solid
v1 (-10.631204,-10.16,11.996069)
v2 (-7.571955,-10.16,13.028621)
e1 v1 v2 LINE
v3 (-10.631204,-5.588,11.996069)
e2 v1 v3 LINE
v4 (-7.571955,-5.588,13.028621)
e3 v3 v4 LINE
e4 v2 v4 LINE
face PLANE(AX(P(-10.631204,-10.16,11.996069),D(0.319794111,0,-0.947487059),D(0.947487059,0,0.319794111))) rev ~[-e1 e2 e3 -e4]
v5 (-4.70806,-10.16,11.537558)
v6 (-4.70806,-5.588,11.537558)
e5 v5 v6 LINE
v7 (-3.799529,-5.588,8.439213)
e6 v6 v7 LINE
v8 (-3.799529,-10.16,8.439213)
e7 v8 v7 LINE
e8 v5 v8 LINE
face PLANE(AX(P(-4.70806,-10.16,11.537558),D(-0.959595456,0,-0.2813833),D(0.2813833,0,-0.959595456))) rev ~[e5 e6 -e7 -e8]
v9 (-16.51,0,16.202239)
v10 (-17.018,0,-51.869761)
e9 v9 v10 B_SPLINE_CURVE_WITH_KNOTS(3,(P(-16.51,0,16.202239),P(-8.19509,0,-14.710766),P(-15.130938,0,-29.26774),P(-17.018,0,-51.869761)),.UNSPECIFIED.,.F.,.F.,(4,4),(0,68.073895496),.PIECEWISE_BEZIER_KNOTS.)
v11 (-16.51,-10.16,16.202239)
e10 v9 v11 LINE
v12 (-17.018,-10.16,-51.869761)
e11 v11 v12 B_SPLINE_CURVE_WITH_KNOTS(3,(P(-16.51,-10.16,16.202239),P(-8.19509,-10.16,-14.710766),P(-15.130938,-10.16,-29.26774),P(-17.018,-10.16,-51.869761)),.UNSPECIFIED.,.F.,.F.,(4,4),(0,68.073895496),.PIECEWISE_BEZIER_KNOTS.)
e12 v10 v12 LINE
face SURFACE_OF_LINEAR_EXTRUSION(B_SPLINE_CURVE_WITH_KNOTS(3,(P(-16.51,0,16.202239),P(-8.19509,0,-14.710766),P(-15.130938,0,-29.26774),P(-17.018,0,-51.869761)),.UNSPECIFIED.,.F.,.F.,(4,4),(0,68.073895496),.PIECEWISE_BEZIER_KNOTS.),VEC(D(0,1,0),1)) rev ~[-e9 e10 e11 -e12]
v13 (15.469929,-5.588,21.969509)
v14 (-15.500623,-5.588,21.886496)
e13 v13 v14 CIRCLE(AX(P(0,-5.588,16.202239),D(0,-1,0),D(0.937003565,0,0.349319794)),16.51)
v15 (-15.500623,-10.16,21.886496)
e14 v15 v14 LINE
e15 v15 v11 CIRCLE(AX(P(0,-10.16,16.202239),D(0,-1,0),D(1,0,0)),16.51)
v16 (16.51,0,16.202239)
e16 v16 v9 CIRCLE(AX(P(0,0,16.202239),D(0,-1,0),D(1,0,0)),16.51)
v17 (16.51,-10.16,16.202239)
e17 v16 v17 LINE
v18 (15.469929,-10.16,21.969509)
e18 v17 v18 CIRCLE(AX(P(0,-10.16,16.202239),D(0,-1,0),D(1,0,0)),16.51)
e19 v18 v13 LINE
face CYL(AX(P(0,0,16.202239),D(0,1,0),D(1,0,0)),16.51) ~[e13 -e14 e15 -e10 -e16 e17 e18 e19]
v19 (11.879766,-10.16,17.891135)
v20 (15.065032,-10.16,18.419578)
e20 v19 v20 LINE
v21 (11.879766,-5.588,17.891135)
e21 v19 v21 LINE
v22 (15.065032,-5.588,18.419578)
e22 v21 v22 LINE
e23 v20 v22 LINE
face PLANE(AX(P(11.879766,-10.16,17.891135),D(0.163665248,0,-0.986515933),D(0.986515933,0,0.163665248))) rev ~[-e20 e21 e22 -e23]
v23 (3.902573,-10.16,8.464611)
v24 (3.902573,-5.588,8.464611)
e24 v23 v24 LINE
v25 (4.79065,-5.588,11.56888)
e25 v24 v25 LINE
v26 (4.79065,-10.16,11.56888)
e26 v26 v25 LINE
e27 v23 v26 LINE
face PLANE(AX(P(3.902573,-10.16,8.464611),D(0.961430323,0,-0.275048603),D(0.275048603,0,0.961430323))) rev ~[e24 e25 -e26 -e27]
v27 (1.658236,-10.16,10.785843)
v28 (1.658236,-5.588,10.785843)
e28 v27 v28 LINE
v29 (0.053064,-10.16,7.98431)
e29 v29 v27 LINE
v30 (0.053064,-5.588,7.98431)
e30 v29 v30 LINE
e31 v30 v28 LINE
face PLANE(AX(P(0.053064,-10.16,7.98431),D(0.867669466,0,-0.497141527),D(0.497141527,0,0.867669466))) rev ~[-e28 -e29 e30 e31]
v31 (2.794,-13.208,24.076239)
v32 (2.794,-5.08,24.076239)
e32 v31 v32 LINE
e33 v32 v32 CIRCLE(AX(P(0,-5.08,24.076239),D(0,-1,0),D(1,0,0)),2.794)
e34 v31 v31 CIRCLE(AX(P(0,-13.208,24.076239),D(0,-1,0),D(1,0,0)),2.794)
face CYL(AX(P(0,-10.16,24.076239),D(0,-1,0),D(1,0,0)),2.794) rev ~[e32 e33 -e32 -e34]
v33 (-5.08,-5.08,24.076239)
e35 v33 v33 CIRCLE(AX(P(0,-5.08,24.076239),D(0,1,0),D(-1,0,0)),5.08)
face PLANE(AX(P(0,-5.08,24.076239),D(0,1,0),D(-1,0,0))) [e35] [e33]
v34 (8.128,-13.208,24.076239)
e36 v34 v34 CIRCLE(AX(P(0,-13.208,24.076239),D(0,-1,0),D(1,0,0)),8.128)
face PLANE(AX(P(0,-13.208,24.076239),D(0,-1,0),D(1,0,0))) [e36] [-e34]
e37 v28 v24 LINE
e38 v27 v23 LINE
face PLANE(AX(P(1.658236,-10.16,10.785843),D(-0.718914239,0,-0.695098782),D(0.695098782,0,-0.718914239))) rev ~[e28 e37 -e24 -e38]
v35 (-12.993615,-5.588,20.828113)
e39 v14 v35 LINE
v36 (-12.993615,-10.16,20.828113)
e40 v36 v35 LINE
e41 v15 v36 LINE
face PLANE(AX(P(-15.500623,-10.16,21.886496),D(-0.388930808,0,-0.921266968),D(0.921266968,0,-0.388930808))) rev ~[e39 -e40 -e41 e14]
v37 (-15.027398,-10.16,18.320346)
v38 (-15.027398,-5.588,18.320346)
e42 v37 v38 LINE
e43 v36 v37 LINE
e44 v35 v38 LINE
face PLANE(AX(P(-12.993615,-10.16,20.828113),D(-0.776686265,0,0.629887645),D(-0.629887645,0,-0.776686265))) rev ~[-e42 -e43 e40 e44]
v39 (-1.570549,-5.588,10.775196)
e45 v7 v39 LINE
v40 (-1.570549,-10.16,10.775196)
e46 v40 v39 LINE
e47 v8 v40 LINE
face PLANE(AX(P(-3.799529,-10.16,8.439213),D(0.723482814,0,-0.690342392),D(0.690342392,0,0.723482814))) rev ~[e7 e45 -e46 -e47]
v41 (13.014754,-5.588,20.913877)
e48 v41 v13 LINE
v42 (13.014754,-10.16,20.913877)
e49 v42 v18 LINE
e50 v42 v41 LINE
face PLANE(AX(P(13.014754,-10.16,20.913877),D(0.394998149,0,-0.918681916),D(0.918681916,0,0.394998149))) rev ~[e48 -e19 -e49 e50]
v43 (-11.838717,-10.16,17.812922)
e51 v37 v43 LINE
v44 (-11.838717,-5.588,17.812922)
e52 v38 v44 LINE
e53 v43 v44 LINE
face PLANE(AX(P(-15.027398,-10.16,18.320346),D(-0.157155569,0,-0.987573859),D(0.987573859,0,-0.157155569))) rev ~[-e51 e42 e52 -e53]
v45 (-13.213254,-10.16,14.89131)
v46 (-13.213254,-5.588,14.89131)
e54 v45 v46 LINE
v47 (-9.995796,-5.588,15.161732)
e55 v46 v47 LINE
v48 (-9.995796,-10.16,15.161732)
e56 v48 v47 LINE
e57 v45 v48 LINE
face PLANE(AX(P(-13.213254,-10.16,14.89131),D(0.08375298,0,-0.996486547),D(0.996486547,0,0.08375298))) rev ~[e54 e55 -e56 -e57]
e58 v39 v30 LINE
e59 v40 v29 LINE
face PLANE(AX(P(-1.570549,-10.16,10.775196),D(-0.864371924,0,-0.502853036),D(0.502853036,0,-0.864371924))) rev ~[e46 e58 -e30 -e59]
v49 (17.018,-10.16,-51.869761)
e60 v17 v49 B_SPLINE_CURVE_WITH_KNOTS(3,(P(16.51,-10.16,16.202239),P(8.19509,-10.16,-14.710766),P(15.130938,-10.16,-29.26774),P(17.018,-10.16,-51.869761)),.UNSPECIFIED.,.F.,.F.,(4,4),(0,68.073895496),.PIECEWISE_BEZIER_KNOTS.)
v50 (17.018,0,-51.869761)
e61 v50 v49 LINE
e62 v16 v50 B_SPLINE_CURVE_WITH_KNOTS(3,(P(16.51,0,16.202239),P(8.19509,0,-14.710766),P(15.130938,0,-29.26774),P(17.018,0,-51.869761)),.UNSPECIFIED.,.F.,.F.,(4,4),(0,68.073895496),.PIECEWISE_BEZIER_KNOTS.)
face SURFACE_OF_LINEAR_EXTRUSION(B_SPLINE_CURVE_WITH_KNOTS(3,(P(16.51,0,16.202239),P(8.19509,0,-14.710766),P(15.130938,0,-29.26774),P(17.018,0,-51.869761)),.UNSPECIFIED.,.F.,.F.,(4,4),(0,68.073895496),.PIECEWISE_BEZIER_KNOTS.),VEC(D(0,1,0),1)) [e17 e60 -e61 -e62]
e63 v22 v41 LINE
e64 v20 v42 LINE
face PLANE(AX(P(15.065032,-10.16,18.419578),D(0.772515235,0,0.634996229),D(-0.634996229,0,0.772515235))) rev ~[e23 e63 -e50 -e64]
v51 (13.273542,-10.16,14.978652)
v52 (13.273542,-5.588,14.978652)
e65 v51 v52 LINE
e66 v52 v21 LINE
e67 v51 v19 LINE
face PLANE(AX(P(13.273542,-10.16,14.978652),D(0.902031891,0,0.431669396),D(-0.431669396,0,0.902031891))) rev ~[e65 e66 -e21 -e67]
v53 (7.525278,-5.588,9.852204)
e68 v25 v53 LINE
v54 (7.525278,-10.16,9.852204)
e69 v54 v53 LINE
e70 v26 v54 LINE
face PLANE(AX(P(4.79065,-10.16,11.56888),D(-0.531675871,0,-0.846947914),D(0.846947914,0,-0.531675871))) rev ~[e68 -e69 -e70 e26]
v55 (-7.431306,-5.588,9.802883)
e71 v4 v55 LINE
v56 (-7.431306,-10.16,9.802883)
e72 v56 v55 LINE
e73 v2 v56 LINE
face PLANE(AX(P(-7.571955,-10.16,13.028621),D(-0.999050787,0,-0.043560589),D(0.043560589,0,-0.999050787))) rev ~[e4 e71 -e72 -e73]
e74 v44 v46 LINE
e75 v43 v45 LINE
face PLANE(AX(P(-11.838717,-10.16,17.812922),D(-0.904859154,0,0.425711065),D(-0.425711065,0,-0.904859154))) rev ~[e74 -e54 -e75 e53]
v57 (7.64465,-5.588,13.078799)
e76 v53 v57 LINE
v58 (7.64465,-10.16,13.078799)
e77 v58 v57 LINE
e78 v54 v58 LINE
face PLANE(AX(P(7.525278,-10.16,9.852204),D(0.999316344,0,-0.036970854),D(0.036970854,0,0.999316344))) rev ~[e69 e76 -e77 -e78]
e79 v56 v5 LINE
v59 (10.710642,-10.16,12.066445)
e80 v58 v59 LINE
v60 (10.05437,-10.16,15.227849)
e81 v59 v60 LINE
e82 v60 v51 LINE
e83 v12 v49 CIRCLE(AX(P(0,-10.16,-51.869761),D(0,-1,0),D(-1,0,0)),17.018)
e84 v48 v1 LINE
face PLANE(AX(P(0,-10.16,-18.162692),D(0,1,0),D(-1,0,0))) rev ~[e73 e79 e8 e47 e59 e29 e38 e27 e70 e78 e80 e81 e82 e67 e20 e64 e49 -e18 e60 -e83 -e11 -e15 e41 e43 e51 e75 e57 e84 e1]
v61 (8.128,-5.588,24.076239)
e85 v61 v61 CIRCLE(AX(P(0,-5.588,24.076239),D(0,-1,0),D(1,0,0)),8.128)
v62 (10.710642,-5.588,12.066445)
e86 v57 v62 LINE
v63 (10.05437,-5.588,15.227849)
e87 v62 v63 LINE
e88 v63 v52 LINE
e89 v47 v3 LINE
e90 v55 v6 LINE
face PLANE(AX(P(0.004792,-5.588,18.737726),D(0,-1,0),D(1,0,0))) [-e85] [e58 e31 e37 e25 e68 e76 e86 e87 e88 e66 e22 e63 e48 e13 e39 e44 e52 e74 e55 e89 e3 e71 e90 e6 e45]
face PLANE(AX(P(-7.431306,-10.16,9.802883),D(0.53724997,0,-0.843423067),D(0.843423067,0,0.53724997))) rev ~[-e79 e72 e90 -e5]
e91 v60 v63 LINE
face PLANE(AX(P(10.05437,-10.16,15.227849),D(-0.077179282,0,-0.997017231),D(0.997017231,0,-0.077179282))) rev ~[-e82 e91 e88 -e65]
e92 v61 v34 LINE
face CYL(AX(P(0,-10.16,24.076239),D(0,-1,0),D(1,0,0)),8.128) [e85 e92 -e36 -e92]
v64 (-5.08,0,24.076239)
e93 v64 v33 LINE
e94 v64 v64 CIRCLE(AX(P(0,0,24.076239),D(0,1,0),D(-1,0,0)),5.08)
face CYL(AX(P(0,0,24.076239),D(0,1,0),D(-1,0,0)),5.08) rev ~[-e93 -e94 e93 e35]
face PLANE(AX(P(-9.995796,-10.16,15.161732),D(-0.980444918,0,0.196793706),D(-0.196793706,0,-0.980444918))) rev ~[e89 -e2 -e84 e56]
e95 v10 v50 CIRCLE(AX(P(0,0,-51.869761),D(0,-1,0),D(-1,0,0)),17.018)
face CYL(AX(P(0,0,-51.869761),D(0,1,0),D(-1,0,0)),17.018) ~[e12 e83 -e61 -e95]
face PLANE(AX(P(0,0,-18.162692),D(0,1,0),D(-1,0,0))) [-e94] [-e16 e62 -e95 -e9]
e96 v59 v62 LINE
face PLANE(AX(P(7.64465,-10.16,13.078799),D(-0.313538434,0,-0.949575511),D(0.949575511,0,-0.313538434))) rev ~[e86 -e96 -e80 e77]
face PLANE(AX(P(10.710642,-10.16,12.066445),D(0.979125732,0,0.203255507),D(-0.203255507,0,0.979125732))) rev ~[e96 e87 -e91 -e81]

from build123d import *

# Parameters (mm, degrees)
F1_DEPTH = 10.16
F2_R     = 8.128
F2_R_2   = 2.794
F3_DEPTH = 3.048
F4_DEPTH = 50.8
F5_R     = 8.128
F6_DEPTH = 4.572
F7_R     = 5.08
F7_R_2   = 2.794
F8_DEPTH = 5.08


with BuildPart() as f1:
    # F0 (on Front) → F1 (new body)
    with BuildSketch(Plane.XZ):
        with BuildLine():
            add(Edge.make_bspline(
                [(16.51, 16.2022389048), (8.1950903917, -14.7107664531), (15.1309384414, -29.2677398155), (17.018, -51.8697610952)],
                knots=[0, 0, 0, 0, 68.073895496, 68.073895496, 68.073895496, 68.073895496], degree=3))
            ThreePointArc((16.51, 16.2022389048), (0, 32.7122389048), (-16.51, 16.2022389048))
            add(Edge.make_bspline(
                [(-16.51, 16.2022389048), (-8.1950903917, -14.7107664531), (-15.1309384414, -29.2677398155), (-17.018, -51.8697610952)],
                knots=[0, 0, 0, 0, 68.073895496, 68.073895496, 68.073895496, 68.073895496], degree=3))
            ThreePointArc((-17.018, -51.8697610952), (0, -68.8877610952), (17.018, -51.8697610952))
        make_face()
    extrude(amount=F1_DEPTH)

    # F2 (on face) → F3 (join)
    with BuildSketch(Plane.XZ.offset(10.16)):
        with Locations((0, 24.0762389048)):
            Circle(F2_R)
        with Locations((0, 24.0762389048)):
            Circle(F2_R_2, mode=Mode.SUBTRACT)
    extrude(amount=F3_DEPTH)

    # F4 (cut, symmetric): a face of the model
    f4_faces = [f1.faces().sort_by_distance(p)[0] for p in [
        (0, -10.16, 24.0762389048),
    ]]
    extrude(f4_faces, amount=F4_DEPTH, both=True, mode=Mode.SUBTRACT)

    # F5 (on face) → F6 (cut)
    with BuildSketch(Plane.XZ.offset(10.16)):
        with BuildLine():
            ThreePointArc((15.469928865, 21.9695087018), (-0.0442530739, 32.7121795972), (-15.5006234178, 21.8864955545))
            Line((-15.5006234178, 21.8864955545), (-12.9936152173, 20.8281131752))
            Line((-12.9936152173, 20.8281131752), (-15.0273981388, 18.3203464733))
            Line((-15.0273981388, 18.3203464733), (-11.8387170074, 17.8129221485))
            Line((-11.8387170074, 17.8129221485), (-13.2132540393, 14.8913104783))
            Line((-13.2132540393, 14.8913104783), (-9.995795597, 15.1617323254))
            Line((-9.995795597, 15.1617323254), (-10.6312036432, 11.9960691377))
            Line((-10.6312036432, 11.9960691377), (-7.5719548797, 13.0286212217))
            Line((-7.5719548797, 13.0286212217), (-7.4313063342, 9.8028833542))
            Line((-7.4313063342, 9.8028833542), (-4.7080596678, 11.5375575014))
            Line((-4.7080596678, 11.5375575014), (-3.7995285128, 8.4392131139))
            Line((-3.7995285128, 8.4392131139), (-1.570549141, 10.7751963679))
            Line((-1.570549141, 10.7751963679), (0.0530640951, 7.9843099742))
            Line((0.0530640951, 7.9843099742), (1.6582359931, 10.7858434794))
            Line((1.6582359931, 10.7858434794), (3.9025728106, 8.4646112522))
            Line((3.9025728106, 8.4646112522), (4.7906504787, 11.5688800644))
            Line((4.7906504787, 11.5688800644), (7.5252781797, 9.8522035834))
            Line((7.5252781797, 9.8522035834), (7.6446497718, 13.0787988828))
            Line((7.6446497718, 13.0787988828), (10.7106417342, 12.0664451452))
            Line((10.7106417342, 12.0664451452), (10.0543698074, 15.2278489412))
            Line((10.0543698074, 15.2278489412), (13.2735417227, 14.9786522665))
            Line((13.2735417227, 14.9786522665), (11.8797664159, 17.8911352617))
            Line((11.8797664159, 17.8911352617), (15.0650317137, 18.4195780548))
            Line((15.0650317137, 18.4195780548), (13.0147541814, 20.913877324))
            Line((13.0147541814, 20.913877324), (15.469928865, 21.9695087018))
        make_face()
        with BuildLine():
            Line((-11.7664292563, 17.8014187834), (-11.8387170074, 17.8129221485))
            Line((-11.8387170074, 17.8129221485), (-11.8075561021, 17.8791554056))
            ThreePointArc((-11.8075561021, 17.8791554056), (-11.7870567643, 17.84025319), (-11.7664292563, 17.8014187834))
        make_face(mode=Mode.SUBTRACT)
        with BuildLine():
            Line((-9.9228554611, 15.1678628183), (-9.995795597, 15.1617323254))
            Line((-9.995795597, 15.1617323254), (-9.9813908269, 15.2334982572))
            ThreePointArc((-9.9813908269, 15.2334982572), (-9.952177253, 15.2006322819), (-9.9228554611, 15.1678628183))
        make_face(mode=Mode.SUBTRACT)
        with BuildLine():
            Line((-12.9261809524, 20.7996444858), (-12.9936152173, 20.8281131752))
            Line((-12.9936152173, 20.8281131752), (-12.9475091354, 20.8849645215))
            ThreePointArc((-12.9475091354, 20.8849645215), (-12.9369153807, 20.842286921), (-12.9261809524, 20.7996444858))
        make_face(mode=Mode.SUBTRACT)
        with BuildLine():
            Line((-7.5026013746, 13.0520292908), (-7.5719548797, 13.0286212217))
            Line((-7.5719548797, 13.0286212217), (-7.5751433977, 13.1017490531))
            ThreePointArc((-7.5751433977, 13.1017490531), (-7.5389133745, 13.0768293692), (-7.5026013746, 13.0520292908))
        make_face(mode=Mode.SUBTRACT)
        with BuildLine():
            Line((-4.646323367, 11.5768827546), (-4.7080596678, 11.5375575014))
            Line((-4.7080596678, 11.5375575014), (-4.7286561687, 11.6077973086))
            ThreePointArc((-4.7286561687, 11.6077973086), (-4.6875152535, 11.5922721575), (-4.646323367, 11.5768827546))
        make_face(mode=Mode.SUBTRACT)
        with BuildLine():
            Line((-1.5200179341, 10.8281533646), (-1.570549141, 10.7751963679))
            Line((-1.570549141, 10.7751963679), (-1.6073566312, 10.8384660687))
            ThreePointArc((-1.6073566312, 10.8384660687), (-1.5636957843, 10.8332377157), (-1.5200179341, 10.8281533646))
        make_face(mode=Mode.SUBTRACT)
        with BuildLine():
            Line((1.6946254161, 10.8493545514), (1.6582359931, 10.7858434794))
            Line((1.6582359931, 10.7858434794), (1.6073566312, 10.8384660687))
            ThreePointArc((1.6073566312, 10.8384660687), (1.651, 10.8438383667), (1.6946254161, 10.8493545514))
        make_face(mode=Mode.SUBTRACT)
        with BuildLine():
            Line((4.8107832969, 11.639254179), (4.7906504787, 11.5688800644))
            Line((4.7906504787, 11.5688800644), (4.7286561687, 11.6077973086))
            ThreePointArc((4.7286561687, 11.6077973086), (4.7697456655, 11.6234580392), (4.8107832969, 11.639254179))
        make_face(mode=Mode.SUBTRACT)
        with BuildLine():
            Line((7.6473559389, 13.1519461522), (7.6446497718, 13.0787988828))
            Line((7.6446497718, 13.0787988828), (7.5751433977, 13.1017490531))
            ThreePointArc((7.5751433977, 13.1017490531), (7.6112910502, 13.1267880715), (7.6473559389, 13.1519461522))
        make_face(mode=Mode.SUBTRACT)
        with Locations((0, 24.0762389048)):
            Circle(F5_R, mode=Mode.SUBTRACT)
        with BuildLine():
            Line((11.8481693767, 17.9571615707), (11.8797664159, 17.8911352617))
            Line((11.8797664159, 17.8911352617), (11.8075561021, 17.8791554056))
            ThreePointArc((11.8075561021, 17.8791554056), (11.8279270467, 17.9181250071), (11.8481693767, 17.9571615707))
        make_face(mode=Mode.SUBTRACT)
        with BuildLine():
            Line((12.9682741648, 20.9704233621), (13.0147541814, 20.913877324))
            Line((13.0147541814, 20.913877324), (12.9475091354, 20.8849645215))
            ThreePointArc((12.9475091354, 20.8849645215), (12.9579621013, 20.9276768234), (12.9682741648, 20.9704233621))
        make_face(mode=Mode.SUBTRACT)
        with BuildLine():
            Line((-12.9475091354, 20.8849645215), (-12.9936152173, 20.8281131752))
            Line((-12.9936152173, 20.8281131752), (-12.9261809524, 20.7996444858))
            ThreePointArc((-12.9261809524, 20.7996444858), (-12.9369153807, 20.842286921), (-12.9475091354, 20.8849645215))
        make_face()
        with BuildLine():
            Line((-11.8075561021, 17.8791554056), (-11.8387170074, 17.8129221485))
            Line((-11.8387170074, 17.8129221485), (-11.7664292563, 17.8014187834))
            ThreePointArc((-11.7664292563, 17.8014187834), (-11.7870567643, 17.84025319), (-11.8075561021, 17.8791554056))
        make_face()
        with BuildLine():
            Line((-9.9813908269, 15.2334982572), (-9.995795597, 15.1617323254))
            Line((-9.995795597, 15.1617323254), (-9.9228554611, 15.1678628183))
            ThreePointArc((-9.9228554611, 15.1678628183), (-9.952177253, 15.2006322819), (-9.9813908269, 15.2334982572))
        make_face()
        with BuildLine():
            Line((-7.5751433977, 13.1017490531), (-7.5719548797, 13.0286212217))
            Line((-7.5719548797, 13.0286212217), (-7.5026013746, 13.0520292908))
            ThreePointArc((-7.5026013746, 13.0520292908), (-7.5389133745, 13.0768293692), (-7.5751433977, 13.1017490531))
        make_face()
        with BuildLine():
            Line((-4.7286561687, 11.6077973086), (-4.7080596678, 11.5375575014))
            Line((-4.7080596678, 11.5375575014), (-4.646323367, 11.5768827546))
            ThreePointArc((-4.646323367, 11.5768827546), (-4.6875152535, 11.5922721575), (-4.7286561687, 11.6077973086))
        make_face()
        with BuildLine():
            Line((-1.6073566312, 10.8384660687), (-1.570549141, 10.7751963679))
            Line((-1.570549141, 10.7751963679), (-1.5200179341, 10.8281533646))
            ThreePointArc((-1.5200179341, 10.8281533646), (-1.5636957843, 10.8332377157), (-1.6073566312, 10.8384660687))
        make_face()
        with BuildLine():
            Line((1.6073566312, 10.8384660687), (1.6582359931, 10.7858434794))
            Line((1.6582359931, 10.7858434794), (1.6946254161, 10.8493545514))
            ThreePointArc((1.6946254161, 10.8493545514), (1.651, 10.8438383667), (1.6073566312, 10.8384660687))
        make_face()
        with BuildLine():
            Line((4.7286561687, 11.6077973086), (4.7906504787, 11.5688800644))
            Line((4.7906504787, 11.5688800644), (4.8107832969, 11.639254179))
            ThreePointArc((4.8107832969, 11.639254179), (4.7697456655, 11.6234580392), (4.7286561687, 11.6077973086))
        make_face()
        with BuildLine():
            Line((7.5751433977, 13.1017490531), (7.6446497718, 13.0787988828))
            Line((7.6446497718, 13.0787988828), (7.6473559389, 13.1519461522))
            ThreePointArc((7.6473559389, 13.1519461522), (7.6112910502, 13.1267880715), (7.5751433977, 13.1017490531))
        make_face()
        with BuildLine():
            Line((11.8075561021, 17.8791554056), (11.8797664159, 17.8911352617))
            Line((11.8797664159, 17.8911352617), (11.8481693767, 17.9571615707))
            ThreePointArc((11.8481693767, 17.9571615707), (11.8279270467, 17.9181250071), (11.8075561021, 17.8791554056))
        make_face()
        with BuildLine():
            Line((12.9475091354, 20.8849645215), (13.0147541814, 20.913877324))
            Line((13.0147541814, 20.913877324), (12.9682741648, 20.9704233621))
            ThreePointArc((12.9682741648, 20.9704233621), (12.9579621013, 20.9276768234), (12.9475091354, 20.8849645215))
        make_face()
    extrude(amount=-F6_DEPTH, mode=Mode.SUBTRACT)

    # F7 (on face) → F8 (cut)
    with BuildSketch(Plane(origin=(0, 0, 0), x_dir=(-1, 0, 0), z_dir=(0, 1, 0))):
        with Locations((0, 24.0762389048)):
            Circle(F7_R)
        with Locations((0, 24.0762389048)):
            Circle(F7_R_2, mode=Mode.SUBTRACT)
        with Locations((0, 24.0762389048)):
            Circle(F7_R_2)
    extrude(amount=-F8_DEPTH, mode=Mode.SUBTRACT)


solid = f1.part
